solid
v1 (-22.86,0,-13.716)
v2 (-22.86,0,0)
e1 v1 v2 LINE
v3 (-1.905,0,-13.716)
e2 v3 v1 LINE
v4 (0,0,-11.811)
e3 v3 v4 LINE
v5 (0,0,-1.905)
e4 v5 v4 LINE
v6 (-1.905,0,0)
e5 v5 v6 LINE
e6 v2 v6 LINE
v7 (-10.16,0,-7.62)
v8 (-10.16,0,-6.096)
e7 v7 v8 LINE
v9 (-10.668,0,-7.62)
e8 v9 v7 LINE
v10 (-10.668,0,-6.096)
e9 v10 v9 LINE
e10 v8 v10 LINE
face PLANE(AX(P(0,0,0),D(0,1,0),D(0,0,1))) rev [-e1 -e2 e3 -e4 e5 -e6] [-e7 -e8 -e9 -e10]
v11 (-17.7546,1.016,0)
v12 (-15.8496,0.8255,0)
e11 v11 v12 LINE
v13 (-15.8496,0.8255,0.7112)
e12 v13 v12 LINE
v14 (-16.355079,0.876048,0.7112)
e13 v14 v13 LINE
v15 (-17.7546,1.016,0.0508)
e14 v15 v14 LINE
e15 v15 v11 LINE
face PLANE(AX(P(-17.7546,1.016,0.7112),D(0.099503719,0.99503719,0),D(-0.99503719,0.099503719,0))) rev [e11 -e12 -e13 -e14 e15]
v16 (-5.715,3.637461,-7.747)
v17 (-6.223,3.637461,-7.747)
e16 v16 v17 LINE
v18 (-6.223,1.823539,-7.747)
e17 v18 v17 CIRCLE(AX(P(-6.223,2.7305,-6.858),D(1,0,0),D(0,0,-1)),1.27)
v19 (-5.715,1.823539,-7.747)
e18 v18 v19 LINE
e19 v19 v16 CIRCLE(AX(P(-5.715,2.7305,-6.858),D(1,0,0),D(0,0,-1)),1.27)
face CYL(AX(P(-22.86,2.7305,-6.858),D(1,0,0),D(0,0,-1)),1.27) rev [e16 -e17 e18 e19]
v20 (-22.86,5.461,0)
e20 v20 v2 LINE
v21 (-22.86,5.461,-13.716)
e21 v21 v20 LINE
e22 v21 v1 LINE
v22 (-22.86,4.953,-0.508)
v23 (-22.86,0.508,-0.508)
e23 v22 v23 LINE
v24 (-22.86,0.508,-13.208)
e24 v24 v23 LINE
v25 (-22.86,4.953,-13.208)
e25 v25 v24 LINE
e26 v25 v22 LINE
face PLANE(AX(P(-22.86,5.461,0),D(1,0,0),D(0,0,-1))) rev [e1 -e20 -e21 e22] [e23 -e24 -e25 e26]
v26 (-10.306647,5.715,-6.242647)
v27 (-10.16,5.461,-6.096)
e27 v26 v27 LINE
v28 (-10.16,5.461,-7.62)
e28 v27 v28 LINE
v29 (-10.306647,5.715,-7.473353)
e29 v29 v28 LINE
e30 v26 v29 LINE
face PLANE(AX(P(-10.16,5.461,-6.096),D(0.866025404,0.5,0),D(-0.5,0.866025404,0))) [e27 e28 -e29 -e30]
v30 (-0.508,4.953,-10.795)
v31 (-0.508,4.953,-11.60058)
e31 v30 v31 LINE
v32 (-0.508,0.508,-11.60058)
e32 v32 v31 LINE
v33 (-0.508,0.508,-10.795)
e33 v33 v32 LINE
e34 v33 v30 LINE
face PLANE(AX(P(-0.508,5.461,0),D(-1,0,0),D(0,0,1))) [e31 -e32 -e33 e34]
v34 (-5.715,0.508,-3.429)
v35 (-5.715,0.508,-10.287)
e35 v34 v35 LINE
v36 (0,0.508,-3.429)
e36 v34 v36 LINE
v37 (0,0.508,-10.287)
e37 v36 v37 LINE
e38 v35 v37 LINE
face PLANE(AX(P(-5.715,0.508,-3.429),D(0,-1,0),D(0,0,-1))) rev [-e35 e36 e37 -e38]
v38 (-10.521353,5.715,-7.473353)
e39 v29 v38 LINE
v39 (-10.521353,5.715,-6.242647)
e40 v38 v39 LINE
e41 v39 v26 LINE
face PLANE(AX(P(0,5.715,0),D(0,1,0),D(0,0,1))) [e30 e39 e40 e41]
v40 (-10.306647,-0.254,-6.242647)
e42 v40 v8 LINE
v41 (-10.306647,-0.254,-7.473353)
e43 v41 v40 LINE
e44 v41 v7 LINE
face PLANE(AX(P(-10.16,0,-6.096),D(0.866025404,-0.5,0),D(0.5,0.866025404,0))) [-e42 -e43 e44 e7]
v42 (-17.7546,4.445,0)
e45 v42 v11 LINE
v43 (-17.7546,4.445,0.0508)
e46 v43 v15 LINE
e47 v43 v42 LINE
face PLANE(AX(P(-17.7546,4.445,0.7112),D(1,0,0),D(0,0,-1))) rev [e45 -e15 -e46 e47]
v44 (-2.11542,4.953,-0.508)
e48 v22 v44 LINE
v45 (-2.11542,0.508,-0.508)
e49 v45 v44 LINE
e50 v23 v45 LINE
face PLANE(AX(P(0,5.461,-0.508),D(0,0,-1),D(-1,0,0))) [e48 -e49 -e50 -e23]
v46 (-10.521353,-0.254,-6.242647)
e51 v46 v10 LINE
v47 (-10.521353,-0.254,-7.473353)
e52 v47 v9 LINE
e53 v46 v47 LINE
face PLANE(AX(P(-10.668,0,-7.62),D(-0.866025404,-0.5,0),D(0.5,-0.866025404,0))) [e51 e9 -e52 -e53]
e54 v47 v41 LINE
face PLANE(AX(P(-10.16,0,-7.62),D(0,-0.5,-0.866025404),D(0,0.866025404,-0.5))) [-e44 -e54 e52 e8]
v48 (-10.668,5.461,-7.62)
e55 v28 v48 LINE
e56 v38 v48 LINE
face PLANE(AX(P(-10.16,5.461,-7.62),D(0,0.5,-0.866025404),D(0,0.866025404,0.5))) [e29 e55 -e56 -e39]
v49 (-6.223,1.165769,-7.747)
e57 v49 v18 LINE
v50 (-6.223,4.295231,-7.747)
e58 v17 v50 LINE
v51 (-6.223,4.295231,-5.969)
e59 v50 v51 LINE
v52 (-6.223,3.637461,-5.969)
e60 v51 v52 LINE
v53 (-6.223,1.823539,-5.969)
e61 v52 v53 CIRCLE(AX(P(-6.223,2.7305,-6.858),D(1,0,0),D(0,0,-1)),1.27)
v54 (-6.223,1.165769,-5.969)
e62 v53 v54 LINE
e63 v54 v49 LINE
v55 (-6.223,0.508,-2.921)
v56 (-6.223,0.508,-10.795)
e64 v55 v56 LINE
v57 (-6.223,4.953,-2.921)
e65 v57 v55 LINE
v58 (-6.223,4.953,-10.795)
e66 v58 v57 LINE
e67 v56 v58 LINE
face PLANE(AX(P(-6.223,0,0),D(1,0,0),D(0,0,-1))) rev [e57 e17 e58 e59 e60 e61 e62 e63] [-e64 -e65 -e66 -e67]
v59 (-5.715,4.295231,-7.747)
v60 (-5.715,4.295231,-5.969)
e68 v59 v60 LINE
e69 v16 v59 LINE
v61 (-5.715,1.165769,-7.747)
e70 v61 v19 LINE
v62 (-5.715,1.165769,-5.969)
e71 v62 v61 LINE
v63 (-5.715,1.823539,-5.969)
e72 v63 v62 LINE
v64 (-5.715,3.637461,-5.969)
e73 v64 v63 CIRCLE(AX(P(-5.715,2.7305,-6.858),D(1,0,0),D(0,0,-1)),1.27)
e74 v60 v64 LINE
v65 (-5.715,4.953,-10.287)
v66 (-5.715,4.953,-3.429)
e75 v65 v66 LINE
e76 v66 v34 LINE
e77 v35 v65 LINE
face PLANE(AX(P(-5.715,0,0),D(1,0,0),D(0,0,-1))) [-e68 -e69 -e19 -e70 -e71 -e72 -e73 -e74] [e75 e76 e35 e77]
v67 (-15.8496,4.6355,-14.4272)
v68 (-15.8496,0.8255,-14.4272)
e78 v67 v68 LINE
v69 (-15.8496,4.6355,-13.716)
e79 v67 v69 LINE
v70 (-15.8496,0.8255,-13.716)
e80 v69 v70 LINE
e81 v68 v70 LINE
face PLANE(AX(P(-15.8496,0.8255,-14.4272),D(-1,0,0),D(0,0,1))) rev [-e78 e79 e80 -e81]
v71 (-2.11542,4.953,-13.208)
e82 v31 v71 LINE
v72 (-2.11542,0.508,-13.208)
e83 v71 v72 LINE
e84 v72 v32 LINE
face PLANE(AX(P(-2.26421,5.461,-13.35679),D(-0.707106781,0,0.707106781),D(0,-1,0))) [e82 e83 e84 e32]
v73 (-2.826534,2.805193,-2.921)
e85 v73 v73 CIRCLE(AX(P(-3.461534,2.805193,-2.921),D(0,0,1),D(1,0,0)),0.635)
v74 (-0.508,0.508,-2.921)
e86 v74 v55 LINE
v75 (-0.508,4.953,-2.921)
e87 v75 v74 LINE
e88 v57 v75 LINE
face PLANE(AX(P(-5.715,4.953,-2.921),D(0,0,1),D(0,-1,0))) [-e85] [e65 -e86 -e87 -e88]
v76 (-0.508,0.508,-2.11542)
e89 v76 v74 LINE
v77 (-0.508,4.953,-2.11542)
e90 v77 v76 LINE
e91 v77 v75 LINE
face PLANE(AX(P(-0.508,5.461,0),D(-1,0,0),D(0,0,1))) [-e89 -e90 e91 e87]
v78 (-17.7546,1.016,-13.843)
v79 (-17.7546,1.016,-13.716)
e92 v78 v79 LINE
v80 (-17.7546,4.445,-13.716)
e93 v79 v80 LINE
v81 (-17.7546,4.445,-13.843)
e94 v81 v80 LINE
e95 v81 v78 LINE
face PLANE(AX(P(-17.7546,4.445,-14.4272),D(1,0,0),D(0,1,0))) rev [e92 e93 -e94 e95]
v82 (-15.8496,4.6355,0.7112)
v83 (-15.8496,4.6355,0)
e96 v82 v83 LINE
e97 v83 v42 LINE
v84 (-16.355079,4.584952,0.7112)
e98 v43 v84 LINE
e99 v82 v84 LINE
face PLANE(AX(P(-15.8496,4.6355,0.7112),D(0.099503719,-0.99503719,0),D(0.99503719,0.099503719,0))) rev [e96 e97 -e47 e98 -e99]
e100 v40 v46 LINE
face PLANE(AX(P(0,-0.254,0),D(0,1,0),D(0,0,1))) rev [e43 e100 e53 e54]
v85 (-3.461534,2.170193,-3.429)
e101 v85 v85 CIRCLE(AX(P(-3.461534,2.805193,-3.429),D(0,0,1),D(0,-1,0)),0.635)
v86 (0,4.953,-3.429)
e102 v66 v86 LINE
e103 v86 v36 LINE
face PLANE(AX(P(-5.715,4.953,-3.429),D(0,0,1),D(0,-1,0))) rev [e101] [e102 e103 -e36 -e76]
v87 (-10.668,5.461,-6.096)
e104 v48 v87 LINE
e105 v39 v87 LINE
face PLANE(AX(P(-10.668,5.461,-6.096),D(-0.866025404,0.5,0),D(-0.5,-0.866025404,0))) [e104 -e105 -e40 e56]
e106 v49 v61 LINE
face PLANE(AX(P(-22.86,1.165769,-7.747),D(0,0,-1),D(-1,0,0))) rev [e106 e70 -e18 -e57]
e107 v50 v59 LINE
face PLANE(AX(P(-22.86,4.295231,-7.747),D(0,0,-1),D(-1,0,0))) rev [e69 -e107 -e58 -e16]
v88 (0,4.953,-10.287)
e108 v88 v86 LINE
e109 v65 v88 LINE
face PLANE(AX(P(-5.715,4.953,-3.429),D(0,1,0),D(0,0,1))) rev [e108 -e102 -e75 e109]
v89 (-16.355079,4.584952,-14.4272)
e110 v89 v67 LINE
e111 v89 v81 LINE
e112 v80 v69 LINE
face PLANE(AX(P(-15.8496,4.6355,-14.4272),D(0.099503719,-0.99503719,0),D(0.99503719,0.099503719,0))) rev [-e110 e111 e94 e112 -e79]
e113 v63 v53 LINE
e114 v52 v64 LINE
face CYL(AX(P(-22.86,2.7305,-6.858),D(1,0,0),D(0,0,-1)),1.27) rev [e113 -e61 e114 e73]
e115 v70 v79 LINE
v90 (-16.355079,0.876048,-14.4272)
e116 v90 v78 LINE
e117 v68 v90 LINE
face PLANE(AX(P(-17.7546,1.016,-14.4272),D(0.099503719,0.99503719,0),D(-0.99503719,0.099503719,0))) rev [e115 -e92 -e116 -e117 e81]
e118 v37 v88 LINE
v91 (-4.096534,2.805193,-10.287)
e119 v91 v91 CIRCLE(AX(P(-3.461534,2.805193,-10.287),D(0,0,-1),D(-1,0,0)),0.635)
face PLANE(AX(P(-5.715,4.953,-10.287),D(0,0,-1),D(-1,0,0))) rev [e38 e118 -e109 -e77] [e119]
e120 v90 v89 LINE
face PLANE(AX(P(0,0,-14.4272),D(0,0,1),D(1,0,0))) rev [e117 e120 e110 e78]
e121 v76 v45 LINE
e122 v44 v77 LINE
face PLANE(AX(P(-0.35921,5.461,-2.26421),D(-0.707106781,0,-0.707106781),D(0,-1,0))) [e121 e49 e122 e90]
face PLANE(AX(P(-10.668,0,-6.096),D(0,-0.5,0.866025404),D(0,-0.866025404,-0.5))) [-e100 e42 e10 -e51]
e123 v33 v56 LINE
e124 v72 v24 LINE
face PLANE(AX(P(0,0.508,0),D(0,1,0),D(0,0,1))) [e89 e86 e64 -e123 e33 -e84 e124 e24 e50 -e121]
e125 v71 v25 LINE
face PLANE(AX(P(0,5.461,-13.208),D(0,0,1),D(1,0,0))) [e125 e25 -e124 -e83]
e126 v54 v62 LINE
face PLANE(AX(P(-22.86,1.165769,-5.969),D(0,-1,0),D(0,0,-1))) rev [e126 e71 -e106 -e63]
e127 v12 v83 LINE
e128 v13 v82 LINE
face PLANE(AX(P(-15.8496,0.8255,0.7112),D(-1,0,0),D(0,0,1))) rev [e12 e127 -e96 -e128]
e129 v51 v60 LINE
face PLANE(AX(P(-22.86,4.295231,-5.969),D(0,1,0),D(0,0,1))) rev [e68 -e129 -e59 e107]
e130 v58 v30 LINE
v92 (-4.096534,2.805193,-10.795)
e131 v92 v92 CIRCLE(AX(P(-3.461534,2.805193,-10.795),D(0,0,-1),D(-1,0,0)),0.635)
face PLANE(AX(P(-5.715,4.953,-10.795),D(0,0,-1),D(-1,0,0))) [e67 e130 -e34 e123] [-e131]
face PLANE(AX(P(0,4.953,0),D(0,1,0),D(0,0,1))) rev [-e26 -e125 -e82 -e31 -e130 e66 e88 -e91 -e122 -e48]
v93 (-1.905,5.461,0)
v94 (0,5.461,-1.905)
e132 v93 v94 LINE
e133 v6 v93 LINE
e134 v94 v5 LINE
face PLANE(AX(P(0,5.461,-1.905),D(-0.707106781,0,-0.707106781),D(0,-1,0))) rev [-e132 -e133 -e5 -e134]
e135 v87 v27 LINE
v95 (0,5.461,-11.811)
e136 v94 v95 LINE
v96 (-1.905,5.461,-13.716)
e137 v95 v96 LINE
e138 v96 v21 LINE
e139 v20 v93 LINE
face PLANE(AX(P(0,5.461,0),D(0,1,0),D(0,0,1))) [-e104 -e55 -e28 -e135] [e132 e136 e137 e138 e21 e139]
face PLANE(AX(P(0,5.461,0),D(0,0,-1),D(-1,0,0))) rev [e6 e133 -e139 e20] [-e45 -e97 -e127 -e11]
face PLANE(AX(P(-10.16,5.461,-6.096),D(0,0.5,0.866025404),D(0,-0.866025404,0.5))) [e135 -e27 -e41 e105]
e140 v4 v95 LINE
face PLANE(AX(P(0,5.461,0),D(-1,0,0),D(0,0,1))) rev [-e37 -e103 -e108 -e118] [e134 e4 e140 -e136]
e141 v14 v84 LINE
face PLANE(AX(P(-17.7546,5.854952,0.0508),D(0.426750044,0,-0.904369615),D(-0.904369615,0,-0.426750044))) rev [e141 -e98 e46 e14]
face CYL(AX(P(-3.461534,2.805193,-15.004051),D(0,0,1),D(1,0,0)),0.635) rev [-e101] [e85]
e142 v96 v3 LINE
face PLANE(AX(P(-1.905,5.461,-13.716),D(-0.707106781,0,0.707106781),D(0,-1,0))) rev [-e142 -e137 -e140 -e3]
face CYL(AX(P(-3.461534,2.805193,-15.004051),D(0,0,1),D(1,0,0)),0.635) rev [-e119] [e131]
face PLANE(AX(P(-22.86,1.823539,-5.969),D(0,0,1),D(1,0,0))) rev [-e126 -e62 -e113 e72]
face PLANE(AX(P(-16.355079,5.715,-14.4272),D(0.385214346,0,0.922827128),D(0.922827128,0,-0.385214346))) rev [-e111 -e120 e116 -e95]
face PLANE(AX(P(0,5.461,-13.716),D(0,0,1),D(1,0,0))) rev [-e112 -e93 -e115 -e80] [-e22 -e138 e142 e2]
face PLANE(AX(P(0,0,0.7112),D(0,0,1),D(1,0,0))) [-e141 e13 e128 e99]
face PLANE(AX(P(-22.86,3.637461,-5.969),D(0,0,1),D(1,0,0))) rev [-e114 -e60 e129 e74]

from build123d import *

# Parameters (mm, degrees)
SKETCH1_W           = 22.86
SKETCH1_H           = 13.716
BOSS_EXTRUDE1_DEPTH = 5.461
CHAMFER1_SIZE       = 1.905
SKETCH2_W           = 6.858
SKETCH2_H           = 4.445
CUT_EXTRUDE1_DEPTH  = 5.715
SHELL3_START        = 0.508
SHELL3_DEPTH        = 4.445
SKETCH3_R           = 1.27
CUT_EXTRUDE2_DEPTH  = 23.625255844
SKETCH4_W           = 0.508
SKETCH4_H           = 1.524
BOSS_EXTRUDE2_DEPTH = 0.254
BOSS_EXTRUDE2_TAPER = 30
SKETCH5_W           = 0.508
SKETCH5_H           = 1.524
BOSS_EXTRUDE3_DEPTH = 0.254
BOSS_EXTRUDE3_TAPER = 30
BOSS_EXTRUDE4_DEPTH = 0.7112
CUT_EXTRUDE3_DEPTH  = 28.511138389
BOSS_EXTRUDE6_DEPTH = 0.7112
CUT_EXTRUDE4_DEPTH  = 28.876190112
CUT_EXTRUDE5_REACH  = 28.223
SKETCH11_R          = 0.635
CUT_EXTRUDE6_DEPTH  = 24.12479948


# Read off the part's stored shape, not the designer's step: Shell3
with BuildPart() as part:
    # Sketch1 → Boss-Extrude1 (new body)
    with BuildSketch(Plane(origin=(0, 0, 0), x_dir=(1, 0, 0), z_dir=(0, 1, 0))):
        with Locations((-11.43, 6.858)):
            Rectangle(SKETCH1_W, SKETCH1_H)
    extrude(amount=BOSS_EXTRUDE1_DEPTH)

    # Chamfer1
    chamfer1_edges = [part.edges().sort_by_distance(p)[0] for p in [
        (0, 2.7305, 0),
        (0, 2.7305, -13.716),
    ]]
    chamfer(chamfer1_edges, length=CHAMFER1_SIZE)

    # Sketch2 → Cut-Extrude1 (cut)
    with BuildSketch(Plane(origin=(0, 0, 0), x_dir=(0, 0, -1), z_dir=(1, 0, 0))):
        with Locations((6.858, 2.7305)):
            Rectangle(SKETCH2_W, SKETCH2_H)
    extrude(amount=-CUT_EXTRUDE1_DEPTH, mode=Mode.SUBTRACT)

    # Shell3 outline → Shell3 (cut)
    with BuildSketch(Plane(origin=(0, 0, 0), x_dir=(1, 0, 0), z_dir=(0, 1, 0)).offset(SHELL3_START)):
        Polygon((-0.508, 2.11542049), (-0.508, 2.921), (-6.223, 2.921), (-6.223, 10.795), (-0.508, 10.795), (-0.508, 11.60057951), (-2.11542049, 13.208), (-22.86, 13.208), (-22.86, 0.508), (-2.11542049, 0.508), align=None)
    extrude(amount=SHELL3_DEPTH, mode=Mode.SUBTRACT)

    # Sketch3 → Cut-Extrude2 (cut, through all)
    with BuildSketch(Plane(origin=(-5.715, 0, 0), x_dir=(0, 0, -1), z_dir=(1, 0, 0))):
        with Locations((6.858, 2.7305)):
            Circle(SKETCH3_R)
    extrude(amount=-CUT_EXTRUDE2_DEPTH, mode=Mode.SUBTRACT)

    # Sketch4 → Boss-Extrude2 (add)
    with BuildSketch(Plane(origin=(0, 5.461, 0), x_dir=(1, 0, 0), z_dir=(0, 1, 0))):
        with Locations((-10.414, 6.858)):
            Rectangle(SKETCH4_W, SKETCH4_H)
    extrude(amount=BOSS_EXTRUDE2_DEPTH, taper=BOSS_EXTRUDE2_TAPER)

    # Sketch5 → Boss-Extrude3 (add)
    with BuildSketch(Plane.XZ):
        with Locations((-10.414, -6.858)):
            Rectangle(SKETCH5_W, SKETCH5_H)
    extrude(amount=BOSS_EXTRUDE3_DEPTH, taper=BOSS_EXTRUDE3_TAPER)

    # Sketch6 → Boss-Extrude4 (add)
    with BuildSketch(Plane.XY):
        Polygon((-15.8496, 0.8255), (-15.8496, 4.6355), (-17.7546, 4.445), (-17.7546, 1.016), align=None)
    extrude(amount=BOSS_EXTRUDE4_DEPTH)

    # Sketch7 → Cut-Extrude3 (cut, through all, along a direction that is not the sketch's normal)
    with BuildSketch(Plane(origin=(-0.075194059, -0.751940594, 0), x_dir=(-0.9950371902099893, 0.09950371902099862, 0), z_dir=(-0.09950371902099861, -0.9950371902099892, 0))):
        Polygon((17.767583076, -0.0508), (16.36108177, -0.7112), (17.767583076, -0.7112), align=None)
    extrude(amount=-CUT_EXTRUDE3_DEPTH, dir=(0, -1, 0), mode=Mode.SUBTRACT)

    # Sketch9 → Boss-Extrude6 (add)
    with BuildSketch(Plane(origin=(0, 0, -13.716), x_dir=(-1, 0, 0), z_dir=(0, 0, -1))):
        Polygon((17.7546, 1.016), (15.8496, 0.8255), (15.8496, 4.6355), (17.7546, 4.445), align=None)
    extrude(amount=BOSS_EXTRUDE6_DEPTH)

    # Sketch10 → Cut-Extrude4 (cut, through all, along a direction that is not the sketch's normal)
    with BuildSketch(Plane(origin=(-0.075194059, -0.751940594, 0), x_dir=(0.9950371902099892, -0.09950371902099901, 0), z_dir=(-0.09950371902099903, -0.9950371902099893, 0))):
        Polygon((-16.36108177, -14.4272), (-17.767583076, -13.843), (-17.767583076, -14.4272), align=None)
    extrude(amount=-CUT_EXTRUDE4_DEPTH, dir=(0, -1, 0), mode=Mode.SUBTRACT)

    # Cut-Extrude5: up to this face of the body (flat: up to its plane)
    cut_extrude5_end = Plane(part.part.faces().sort_by_distance((-12.487710245, 2.7305, -13.208))[0])
    # Sketch11 → Cut-Extrude5 (cut, up to the picked face)
    with BuildSketch(Plane.XY.offset(-2.921), mode=Mode.PRIVATE) as cut_extrude5_sk1:
        with Locations(Location((-3.461534283, 2.805193331, 0), (0, 0, 180))):
            Circle(SKETCH11_R)
    cut_extrude5_tool1 = split(extrude(cut_extrude5_sk1.sketch, amount=-CUT_EXTRUDE5_REACH, mode=Mode.PRIVATE), bisect_by=cut_extrude5_end, keep=Keep.BOTH, mode=Mode.PRIVATE)
    add(cut_extrude5_tool1.solids().sort_by(Axis((-3.461534, 2.805193, -2.921), (0, 0, -1)))[0], mode=Mode.SUBTRACT)

    # Sketch12 → Cut-Extrude6 (cut, through all)
    with BuildSketch(Plane(origin=(-5.715, 0, 0), x_dir=(0, 0, -1), z_dir=(1, 0, 0))):
        with BuildLine():
            Line((5.969, 3.63746141), (5.969, 4.295230705))
            Line((5.969, 4.295230705), (7.747, 4.295230705))
            Line((7.747, 4.295230705), (7.747, 3.63746141))
            ThreePointArc((7.747, 3.63746141), (6.858, 4.0005), (5.969, 3.63746141))
        make_face()
        with BuildLine():
            Line((5.969, 1.82353859), (5.969, 1.165769295))
            Line((5.969, 1.165769295), (7.747, 1.165769295))
            Line((7.747, 1.165769295), (7.747, 1.82353859))
            ThreePointArc((7.747, 1.82353859), (6.858, 1.4605), (5.969, 1.82353859))
        make_face()
    extrude(amount=-CUT_EXTRUDE6_DEPTH, mode=Mode.SUBTRACT)


solid = part.part
